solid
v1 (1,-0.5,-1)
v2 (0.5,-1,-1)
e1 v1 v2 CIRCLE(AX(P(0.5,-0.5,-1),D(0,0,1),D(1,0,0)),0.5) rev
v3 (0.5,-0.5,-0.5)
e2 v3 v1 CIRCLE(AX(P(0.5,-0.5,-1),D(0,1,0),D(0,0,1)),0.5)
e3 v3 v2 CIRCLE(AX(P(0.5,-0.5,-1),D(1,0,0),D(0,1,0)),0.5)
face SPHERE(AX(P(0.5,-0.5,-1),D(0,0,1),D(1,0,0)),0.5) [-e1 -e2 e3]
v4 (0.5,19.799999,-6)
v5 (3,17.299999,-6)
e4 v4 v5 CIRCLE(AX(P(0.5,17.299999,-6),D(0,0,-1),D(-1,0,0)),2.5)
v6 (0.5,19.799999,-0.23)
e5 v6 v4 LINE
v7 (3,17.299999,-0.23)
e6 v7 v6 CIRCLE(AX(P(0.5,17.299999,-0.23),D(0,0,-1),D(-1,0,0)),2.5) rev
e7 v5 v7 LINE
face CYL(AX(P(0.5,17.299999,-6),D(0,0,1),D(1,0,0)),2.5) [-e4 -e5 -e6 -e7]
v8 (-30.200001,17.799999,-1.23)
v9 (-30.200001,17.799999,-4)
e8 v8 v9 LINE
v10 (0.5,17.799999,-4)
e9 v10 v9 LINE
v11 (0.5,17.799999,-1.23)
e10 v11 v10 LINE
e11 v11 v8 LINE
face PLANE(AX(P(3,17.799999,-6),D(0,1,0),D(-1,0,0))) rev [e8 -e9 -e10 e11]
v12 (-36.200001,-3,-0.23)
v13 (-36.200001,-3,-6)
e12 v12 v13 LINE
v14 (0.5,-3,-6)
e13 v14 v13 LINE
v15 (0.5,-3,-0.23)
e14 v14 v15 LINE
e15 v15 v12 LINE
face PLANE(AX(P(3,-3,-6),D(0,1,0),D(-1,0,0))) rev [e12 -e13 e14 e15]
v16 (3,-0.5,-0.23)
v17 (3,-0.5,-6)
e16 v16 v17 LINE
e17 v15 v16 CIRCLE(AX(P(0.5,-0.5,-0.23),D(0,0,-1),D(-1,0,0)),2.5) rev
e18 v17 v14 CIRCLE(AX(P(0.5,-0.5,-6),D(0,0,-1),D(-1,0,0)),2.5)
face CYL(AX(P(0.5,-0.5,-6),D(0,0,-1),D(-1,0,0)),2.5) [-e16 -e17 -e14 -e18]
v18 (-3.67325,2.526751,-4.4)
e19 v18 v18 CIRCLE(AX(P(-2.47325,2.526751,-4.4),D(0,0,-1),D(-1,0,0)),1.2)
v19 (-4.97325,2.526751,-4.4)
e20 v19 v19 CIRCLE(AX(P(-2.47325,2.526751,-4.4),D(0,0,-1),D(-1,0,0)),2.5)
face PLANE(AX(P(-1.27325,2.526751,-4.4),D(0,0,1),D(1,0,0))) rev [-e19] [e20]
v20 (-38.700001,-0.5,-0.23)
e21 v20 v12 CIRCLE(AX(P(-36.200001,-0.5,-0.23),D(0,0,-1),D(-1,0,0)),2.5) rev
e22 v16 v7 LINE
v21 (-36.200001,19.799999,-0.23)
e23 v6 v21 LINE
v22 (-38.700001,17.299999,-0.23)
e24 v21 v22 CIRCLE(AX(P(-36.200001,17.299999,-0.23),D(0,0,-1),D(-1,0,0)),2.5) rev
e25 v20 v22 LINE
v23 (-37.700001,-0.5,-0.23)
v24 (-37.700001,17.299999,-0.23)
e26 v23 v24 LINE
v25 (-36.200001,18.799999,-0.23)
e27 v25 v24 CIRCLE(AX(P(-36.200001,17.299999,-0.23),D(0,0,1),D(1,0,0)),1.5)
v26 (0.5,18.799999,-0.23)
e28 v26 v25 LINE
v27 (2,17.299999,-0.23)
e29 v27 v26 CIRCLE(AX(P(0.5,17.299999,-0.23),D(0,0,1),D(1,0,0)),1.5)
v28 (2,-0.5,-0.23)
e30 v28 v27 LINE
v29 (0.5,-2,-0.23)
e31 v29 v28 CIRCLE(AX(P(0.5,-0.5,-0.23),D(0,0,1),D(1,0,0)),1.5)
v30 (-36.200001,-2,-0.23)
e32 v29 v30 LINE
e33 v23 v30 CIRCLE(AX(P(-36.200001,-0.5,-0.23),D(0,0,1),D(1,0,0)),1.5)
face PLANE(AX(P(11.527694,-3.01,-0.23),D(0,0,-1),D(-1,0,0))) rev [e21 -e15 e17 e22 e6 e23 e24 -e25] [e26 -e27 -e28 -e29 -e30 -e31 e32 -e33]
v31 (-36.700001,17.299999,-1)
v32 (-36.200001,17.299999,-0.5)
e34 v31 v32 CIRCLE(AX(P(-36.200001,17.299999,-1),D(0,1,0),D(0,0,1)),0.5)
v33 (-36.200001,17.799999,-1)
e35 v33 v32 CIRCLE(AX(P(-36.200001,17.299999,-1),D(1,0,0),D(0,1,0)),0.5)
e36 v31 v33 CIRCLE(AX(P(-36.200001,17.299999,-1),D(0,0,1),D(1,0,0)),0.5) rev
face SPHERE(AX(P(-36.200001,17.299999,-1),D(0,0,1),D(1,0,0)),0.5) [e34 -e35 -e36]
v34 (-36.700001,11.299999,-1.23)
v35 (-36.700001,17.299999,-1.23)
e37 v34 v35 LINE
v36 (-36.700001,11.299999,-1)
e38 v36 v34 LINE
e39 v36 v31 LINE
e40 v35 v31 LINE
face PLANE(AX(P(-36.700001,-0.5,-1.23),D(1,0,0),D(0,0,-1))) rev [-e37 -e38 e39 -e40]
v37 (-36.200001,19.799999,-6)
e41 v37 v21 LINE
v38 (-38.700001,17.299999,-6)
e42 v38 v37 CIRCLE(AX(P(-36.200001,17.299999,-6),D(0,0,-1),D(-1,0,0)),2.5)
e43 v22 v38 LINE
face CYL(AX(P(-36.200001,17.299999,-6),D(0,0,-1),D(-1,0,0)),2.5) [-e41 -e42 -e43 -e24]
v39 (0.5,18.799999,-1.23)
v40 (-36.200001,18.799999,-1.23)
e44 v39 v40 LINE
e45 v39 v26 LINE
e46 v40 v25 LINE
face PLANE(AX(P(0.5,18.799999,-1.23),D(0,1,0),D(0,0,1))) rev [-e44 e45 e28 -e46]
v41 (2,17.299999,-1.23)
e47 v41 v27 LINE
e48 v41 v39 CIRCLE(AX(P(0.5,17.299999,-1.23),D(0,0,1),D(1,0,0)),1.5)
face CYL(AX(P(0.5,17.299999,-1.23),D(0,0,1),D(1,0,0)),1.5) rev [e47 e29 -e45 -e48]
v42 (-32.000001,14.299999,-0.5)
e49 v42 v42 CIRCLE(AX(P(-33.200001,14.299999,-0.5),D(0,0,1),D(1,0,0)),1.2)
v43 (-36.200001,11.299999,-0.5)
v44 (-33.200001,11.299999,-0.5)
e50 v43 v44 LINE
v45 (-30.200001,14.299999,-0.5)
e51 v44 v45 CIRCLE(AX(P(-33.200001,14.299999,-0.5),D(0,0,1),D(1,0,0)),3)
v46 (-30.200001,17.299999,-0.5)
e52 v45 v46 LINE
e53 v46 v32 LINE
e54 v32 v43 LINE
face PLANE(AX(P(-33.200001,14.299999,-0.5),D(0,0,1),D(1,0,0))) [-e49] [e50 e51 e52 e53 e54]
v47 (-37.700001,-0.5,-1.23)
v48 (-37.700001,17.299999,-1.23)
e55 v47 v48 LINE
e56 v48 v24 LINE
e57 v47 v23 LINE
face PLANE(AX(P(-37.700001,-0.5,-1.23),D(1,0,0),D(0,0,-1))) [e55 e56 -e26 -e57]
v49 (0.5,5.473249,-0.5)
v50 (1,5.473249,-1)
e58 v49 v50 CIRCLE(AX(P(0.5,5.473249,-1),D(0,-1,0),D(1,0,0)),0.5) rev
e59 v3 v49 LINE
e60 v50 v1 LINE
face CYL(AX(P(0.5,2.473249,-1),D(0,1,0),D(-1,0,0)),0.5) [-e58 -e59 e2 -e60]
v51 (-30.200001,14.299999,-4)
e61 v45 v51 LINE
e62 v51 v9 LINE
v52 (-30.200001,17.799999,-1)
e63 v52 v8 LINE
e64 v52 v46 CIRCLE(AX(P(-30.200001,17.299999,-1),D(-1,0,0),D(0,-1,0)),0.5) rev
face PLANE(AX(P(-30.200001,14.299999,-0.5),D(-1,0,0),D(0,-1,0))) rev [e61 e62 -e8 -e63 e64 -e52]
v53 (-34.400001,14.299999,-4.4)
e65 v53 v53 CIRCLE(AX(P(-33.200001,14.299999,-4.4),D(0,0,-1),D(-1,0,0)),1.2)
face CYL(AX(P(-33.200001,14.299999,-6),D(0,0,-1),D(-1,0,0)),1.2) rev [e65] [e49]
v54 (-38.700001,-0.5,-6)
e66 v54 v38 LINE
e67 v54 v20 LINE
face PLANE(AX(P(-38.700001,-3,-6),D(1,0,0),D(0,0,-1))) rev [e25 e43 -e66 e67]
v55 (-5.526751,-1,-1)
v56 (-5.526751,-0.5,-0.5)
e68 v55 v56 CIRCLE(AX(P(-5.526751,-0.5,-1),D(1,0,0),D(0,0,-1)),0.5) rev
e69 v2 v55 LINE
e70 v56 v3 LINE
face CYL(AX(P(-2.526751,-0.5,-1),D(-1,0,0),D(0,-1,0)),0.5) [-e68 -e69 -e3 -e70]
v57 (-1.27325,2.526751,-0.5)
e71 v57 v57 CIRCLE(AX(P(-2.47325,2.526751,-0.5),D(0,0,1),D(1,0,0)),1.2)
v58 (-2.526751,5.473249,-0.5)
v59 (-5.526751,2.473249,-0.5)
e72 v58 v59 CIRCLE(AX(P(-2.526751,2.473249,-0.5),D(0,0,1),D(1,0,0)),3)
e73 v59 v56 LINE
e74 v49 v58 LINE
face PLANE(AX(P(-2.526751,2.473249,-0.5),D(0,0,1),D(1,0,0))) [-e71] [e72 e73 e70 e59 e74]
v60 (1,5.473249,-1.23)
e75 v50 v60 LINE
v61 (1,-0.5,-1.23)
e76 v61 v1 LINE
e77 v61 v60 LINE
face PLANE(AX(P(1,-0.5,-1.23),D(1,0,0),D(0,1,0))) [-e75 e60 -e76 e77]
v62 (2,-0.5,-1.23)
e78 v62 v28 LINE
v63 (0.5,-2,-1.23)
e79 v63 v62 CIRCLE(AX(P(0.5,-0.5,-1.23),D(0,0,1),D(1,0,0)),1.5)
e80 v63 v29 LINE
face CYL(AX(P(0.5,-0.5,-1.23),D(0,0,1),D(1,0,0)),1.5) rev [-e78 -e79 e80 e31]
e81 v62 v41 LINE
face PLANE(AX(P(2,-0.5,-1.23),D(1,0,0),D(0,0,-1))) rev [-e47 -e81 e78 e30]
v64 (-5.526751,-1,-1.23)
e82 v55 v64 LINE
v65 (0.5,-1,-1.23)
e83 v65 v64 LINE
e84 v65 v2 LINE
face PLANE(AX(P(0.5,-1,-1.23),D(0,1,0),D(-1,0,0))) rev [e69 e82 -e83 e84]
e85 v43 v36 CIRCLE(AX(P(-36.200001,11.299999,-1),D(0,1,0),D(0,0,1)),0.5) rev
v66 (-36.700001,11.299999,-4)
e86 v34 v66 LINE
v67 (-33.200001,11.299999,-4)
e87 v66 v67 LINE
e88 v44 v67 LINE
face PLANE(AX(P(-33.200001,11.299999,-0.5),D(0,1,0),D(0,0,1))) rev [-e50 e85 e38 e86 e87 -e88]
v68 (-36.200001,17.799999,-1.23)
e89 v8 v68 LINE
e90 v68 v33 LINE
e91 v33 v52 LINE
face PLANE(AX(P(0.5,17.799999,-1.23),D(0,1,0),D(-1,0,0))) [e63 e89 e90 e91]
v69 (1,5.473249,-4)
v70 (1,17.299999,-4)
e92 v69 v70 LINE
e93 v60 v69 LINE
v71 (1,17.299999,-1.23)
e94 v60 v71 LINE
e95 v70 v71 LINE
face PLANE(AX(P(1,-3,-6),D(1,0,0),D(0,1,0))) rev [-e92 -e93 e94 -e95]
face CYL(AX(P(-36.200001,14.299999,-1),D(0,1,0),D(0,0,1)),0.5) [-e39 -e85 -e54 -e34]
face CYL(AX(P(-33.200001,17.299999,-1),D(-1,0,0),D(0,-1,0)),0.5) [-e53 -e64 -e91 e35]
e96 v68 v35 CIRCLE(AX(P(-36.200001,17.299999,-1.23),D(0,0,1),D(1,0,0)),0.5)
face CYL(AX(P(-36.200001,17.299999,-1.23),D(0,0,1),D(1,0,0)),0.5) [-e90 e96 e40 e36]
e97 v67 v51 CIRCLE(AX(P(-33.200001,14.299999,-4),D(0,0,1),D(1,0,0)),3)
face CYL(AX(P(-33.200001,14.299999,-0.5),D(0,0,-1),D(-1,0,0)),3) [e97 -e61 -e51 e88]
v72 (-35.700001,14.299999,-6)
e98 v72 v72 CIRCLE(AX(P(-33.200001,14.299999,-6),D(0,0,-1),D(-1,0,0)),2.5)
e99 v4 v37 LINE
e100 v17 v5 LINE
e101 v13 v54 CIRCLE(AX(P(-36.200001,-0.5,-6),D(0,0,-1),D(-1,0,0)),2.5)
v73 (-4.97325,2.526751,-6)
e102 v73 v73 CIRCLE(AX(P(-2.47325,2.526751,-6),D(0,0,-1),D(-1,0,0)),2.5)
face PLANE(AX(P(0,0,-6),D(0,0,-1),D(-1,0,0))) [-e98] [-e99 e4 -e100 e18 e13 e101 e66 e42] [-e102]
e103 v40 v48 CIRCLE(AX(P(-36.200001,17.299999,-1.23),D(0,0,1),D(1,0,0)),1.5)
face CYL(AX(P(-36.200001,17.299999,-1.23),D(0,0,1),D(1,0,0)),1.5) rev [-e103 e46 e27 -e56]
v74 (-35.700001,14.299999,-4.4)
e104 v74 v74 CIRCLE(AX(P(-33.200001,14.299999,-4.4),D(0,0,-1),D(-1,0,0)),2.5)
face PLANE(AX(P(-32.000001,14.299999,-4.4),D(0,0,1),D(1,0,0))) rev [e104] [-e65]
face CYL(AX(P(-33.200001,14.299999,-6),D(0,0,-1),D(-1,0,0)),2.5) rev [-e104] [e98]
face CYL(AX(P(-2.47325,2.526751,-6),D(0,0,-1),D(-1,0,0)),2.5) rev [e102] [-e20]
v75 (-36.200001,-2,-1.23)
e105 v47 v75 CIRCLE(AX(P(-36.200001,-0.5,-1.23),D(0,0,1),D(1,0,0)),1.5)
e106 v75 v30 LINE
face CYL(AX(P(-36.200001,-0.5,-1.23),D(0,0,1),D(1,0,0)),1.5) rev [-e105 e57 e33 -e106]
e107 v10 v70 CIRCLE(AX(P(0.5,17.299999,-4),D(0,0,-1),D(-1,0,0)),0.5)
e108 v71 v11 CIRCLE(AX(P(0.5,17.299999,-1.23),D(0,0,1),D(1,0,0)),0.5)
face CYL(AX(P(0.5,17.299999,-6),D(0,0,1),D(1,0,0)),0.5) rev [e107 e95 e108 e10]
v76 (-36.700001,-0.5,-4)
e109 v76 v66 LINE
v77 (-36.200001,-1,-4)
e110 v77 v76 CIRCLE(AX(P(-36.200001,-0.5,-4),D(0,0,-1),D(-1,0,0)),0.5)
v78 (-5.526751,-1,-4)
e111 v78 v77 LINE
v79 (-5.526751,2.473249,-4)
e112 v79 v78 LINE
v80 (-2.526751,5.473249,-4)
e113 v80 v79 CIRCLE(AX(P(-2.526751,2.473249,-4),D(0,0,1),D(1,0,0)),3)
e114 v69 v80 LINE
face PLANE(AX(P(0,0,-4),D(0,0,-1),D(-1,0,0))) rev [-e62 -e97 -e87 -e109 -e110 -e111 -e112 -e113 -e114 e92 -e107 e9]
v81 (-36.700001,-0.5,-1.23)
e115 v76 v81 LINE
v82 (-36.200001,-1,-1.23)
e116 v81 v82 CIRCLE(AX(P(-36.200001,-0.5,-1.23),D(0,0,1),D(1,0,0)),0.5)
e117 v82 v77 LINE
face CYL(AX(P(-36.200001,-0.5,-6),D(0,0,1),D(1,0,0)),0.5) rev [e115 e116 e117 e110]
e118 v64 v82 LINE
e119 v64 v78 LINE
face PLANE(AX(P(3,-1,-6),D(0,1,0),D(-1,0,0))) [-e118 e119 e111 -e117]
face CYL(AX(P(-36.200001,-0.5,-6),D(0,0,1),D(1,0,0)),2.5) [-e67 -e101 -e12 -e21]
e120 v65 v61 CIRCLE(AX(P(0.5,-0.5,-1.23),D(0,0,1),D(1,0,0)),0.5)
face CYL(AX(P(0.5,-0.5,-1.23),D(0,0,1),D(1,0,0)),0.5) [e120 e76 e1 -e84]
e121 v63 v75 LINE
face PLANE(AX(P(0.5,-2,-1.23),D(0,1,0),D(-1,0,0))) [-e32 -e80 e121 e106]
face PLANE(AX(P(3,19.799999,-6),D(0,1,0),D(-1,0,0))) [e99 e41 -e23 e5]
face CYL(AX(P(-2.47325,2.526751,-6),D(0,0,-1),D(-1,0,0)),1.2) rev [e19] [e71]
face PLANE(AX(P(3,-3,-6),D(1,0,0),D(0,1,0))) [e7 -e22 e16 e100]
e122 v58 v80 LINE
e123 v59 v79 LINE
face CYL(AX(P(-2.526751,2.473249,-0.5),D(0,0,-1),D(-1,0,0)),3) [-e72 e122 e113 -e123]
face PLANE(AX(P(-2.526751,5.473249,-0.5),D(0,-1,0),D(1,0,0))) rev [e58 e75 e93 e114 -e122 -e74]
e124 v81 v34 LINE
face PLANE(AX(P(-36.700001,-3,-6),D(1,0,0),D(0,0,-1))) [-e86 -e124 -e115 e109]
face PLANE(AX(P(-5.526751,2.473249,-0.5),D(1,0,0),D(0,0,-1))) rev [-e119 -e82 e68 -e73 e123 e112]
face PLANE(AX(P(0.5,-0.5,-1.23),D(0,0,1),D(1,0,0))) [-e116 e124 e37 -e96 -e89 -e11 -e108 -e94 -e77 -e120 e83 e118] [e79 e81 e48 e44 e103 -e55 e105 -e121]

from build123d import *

# Parameters (mm, degrees)
STOCK_PART3_1_START                              = -6
STOCK_PART3_1_DEPTH                              = 2
STOCK_PART3_1_START_2                            = -4
STOCK_PART3_1_2_DEPTH                            = 3.77
BOSS_EXTRUDE1_DEPTH                              = 3.5
CBORE_FOR_M2_PAN_HEAD_MACHINE_SCREW1_D           = 2.4
CBORE_FOR_M2_PAN_HEAD_MACHINE_SCREW1_CBORE_D     = 5
CBORE_FOR_M2_PAN_HEAD_MACHINE_SCREW1_CBORE_DEPTH = 1.6
CUT_EXTRUDE1_START                               = -1
CUT_EXTRUDE1_DEPTH                               = 1
FILLET1_R                                        = 0.5


# Read off the part's stored shape, not the designer's step: Stock-Part3-1
with BuildPart() as part:
    # Stock-Part3-1 outline → Stock-Part3-1 (new body)
    with BuildSketch(Plane.XY.offset(STOCK_PART3_1_START)):
        with BuildLine():
            Line((-36.200000763, -3), (0.5, -3))
            ThreePointArc((0.5, -3), (2.267766953, -2.267766953), (3, -0.5))
            Line((3, -0.5), (3, 17.299999237))
            ThreePointArc((3, 17.299999237), (2.267766953, 19.06776619), (0.5, 19.799999237))
            Line((0.5, 19.799999237), (-36.200000763, 19.799999237))
            ThreePointArc((-36.200000763, 19.799999237), (-37.967767716, 19.06776619), (-38.700000763, 17.299999237))
            Line((-38.700000763, 17.299999237), (-38.700000763, -0.5))
            ThreePointArc((-38.700000763, -0.5), (-37.967767716, -2.267766953), (-36.200000763, -3))
        make_face()
    extrude(amount=STOCK_PART3_1_DEPTH)

    # Stock-Part3-1 2 outline → Stock-Part3-1 2 (add)
    with BuildSketch(Plane.XY.offset(STOCK_PART3_1_START_2)):
        with BuildLine():
            Line((-36.200000763, -3), (0.5, -3))
            ThreePointArc((0.5, -3), (2.267766953, -2.267766953), (3, -0.5))
            Line((3, -0.5), (3, 17.299999237))
            ThreePointArc((3, 17.299999237), (2.267766953, 19.06776619), (0.5, 19.799999237))
            Line((0.5, 19.799999237), (-36.200000763, 19.799999237))
            ThreePointArc((-36.200000763, 19.799999237), (-37.967767716, 19.06776619), (-38.700000763, 17.299999237))
            Line((-38.700000763, 17.299999237), (-38.700000763, -0.5))
            ThreePointArc((-38.700000763, -0.5), (-37.967767716, -2.267766953), (-36.200000763, -3))
        make_face()
        with BuildLine():
            ThreePointArc((1, -0.5), (0.853553391, -0.853553391), (0.5, -1))
            Line((0.5, -1), (-36.200000763, -1))
            ThreePointArc((-36.200000763, -1), (-36.553554154, -0.853553391), (-36.700000763, -0.5))
            Line((-36.700000763, -0.5), (-36.700000763, 17.299999237))
            ThreePointArc((-36.700000763, 17.299999237), (-36.553554154, 17.653552628), (-36.200000763, 17.799999237))
            Line((-36.200000763, 17.799999237), (0.5, 17.799999237))
            ThreePointArc((0.5, 17.799999237), (0.853553391, 17.653552628), (1, 17.299999237))
            Line((1, 17.299999237), (1, -0.5))
        make_face(mode=Mode.SUBTRACT)
    extrude(amount=STOCK_PART3_1_2_DEPTH)

    # Sketch1 → Boss-Extrude1 (add)
    with BuildSketch(Plane.XY.offset(-4)):
        with BuildLine():
            Line((-33.200000683, 11.299999157), (-36.700000763, 11.299999157))
            Line((-36.700000763, 11.299999157), (-36.700000763, 17.299999237))
            ThreePointArc((-36.700000763, 17.299999237), (-36.553554154, 17.653552628), (-36.200000763, 17.799999237))
            Line((-36.200000763, 17.799999237), (-30.200000683, 17.799999237))
            Line((-30.200000683, 17.799999237), (-30.200000683, 14.299999157))
            ThreePointArc((-30.200000683, 14.299999157), (-31.078680339, 12.178678814), (-33.200000683, 11.299999157))
        make_face()
        with BuildLine():
            Line((-2.526751091, 5.473249069), (1, 5.473249069))
            Line((1, 5.473249069), (1, -0.5))
            ThreePointArc((1, -0.5), (0.853553391, -0.853553391), (0.5, -1))
            Line((0.5, -1), (-5.526751091, -1))
            Line((-5.526751091, -1), (-5.526751091, 2.473249069))
            ThreePointArc((-5.526751091, 2.473249069), (-4.648071434, 4.594569413), (-2.526751091, 5.473249069))
        make_face()
    extrude(amount=BOSS_EXTRUDE1_DEPTH)

    # CBORE for M2 Pan Head Machine Screw1 (through all)
    with Locations(Plane(origin=(0, 0, -6), x_dir=(-1, 0, 0), z_dir=(0, 0, -1))):
        with Locations((2.473250112, 2.526750908), (33.200000683, 14.299999157)):
            CounterBoreHole(CBORE_FOR_M2_PAN_HEAD_MACHINE_SCREW1_D / 2, CBORE_FOR_M2_PAN_HEAD_MACHINE_SCREW1_CBORE_D / 2, CBORE_FOR_M2_PAN_HEAD_MACHINE_SCREW1_CBORE_DEPTH)

    # Sketch4 → Cut-Extrude1 (cut)
    with BuildSketch(Plane.XY.offset(-0.23).offset(CUT_EXTRUDE1_START)):
        with BuildLine():
            Line((2, -0.5), (2, 17.299999237))
            ThreePointArc((2, 17.299999237), (1.560660172, 18.360659409), (0.5, 18.799999237))
            Line((0.5, 18.799999237), (-36.200000763, 18.799999237))
            ThreePointArc((-36.200000763, 18.799999237), (-37.260660935, 18.360659409), (-37.700000763, 17.299999237))
            Line((-37.700000763, 17.299999237), (-37.700000763, -0.5))
            ThreePointArc((-37.700000763, -0.5), (-37.260660935, -1.560660172), (-36.200000763, -2))
            Line((-36.200000763, -2), (0.5, -2))
            ThreePointArc((0.5, -2), (1.560660172, -1.560660172), (2, -0.5))
        make_face()
        with BuildLine():
            Line((1, -0.5), (1, 17.299999237))
            ThreePointArc((1, 17.299999237), (0.853553391, 17.653552628), (0.5, 17.799999237))
            Line((0.5, 17.799999237), (-36.200000763, 17.799999237))
            ThreePointArc((-36.200000763, 17.799999237), (-36.553554154, 17.653552628), (-36.700000763, 17.299999237))
            Line((-36.700000763, 17.299999237), (-36.700000763, -0.5))
            ThreePointArc((-36.700000763, -0.5), (-36.553554154, -0.853553391), (-36.200000763, -1))
            Line((-36.200000763, -1), (0.5, -1))
            ThreePointArc((0.5, -1), (0.853553391, -0.853553391), (1, -0.5))
        make_face(mode=Mode.SUBTRACT)
    extrude(amount=CUT_EXTRUDE1_DEPTH, mode=Mode.SUBTRACT)

    # Fillet1
    fillet1_edges = [part.edges().sort_by_distance(p)[0] for p in [
        (-33.200000723, 17.799999237, -0.5),
        (-36.553554154, 17.653552628, -0.5),
        (-36.700000763, 14.299999197, -0.5),
        (-2.513375545, -1, -0.5),
        (0.853553391, -0.853553391, -0.5),
        (1, 2.486624535, -0.5),
    ]]
    fillet(fillet1_edges, radius=FILLET1_R)


solid = part.part
